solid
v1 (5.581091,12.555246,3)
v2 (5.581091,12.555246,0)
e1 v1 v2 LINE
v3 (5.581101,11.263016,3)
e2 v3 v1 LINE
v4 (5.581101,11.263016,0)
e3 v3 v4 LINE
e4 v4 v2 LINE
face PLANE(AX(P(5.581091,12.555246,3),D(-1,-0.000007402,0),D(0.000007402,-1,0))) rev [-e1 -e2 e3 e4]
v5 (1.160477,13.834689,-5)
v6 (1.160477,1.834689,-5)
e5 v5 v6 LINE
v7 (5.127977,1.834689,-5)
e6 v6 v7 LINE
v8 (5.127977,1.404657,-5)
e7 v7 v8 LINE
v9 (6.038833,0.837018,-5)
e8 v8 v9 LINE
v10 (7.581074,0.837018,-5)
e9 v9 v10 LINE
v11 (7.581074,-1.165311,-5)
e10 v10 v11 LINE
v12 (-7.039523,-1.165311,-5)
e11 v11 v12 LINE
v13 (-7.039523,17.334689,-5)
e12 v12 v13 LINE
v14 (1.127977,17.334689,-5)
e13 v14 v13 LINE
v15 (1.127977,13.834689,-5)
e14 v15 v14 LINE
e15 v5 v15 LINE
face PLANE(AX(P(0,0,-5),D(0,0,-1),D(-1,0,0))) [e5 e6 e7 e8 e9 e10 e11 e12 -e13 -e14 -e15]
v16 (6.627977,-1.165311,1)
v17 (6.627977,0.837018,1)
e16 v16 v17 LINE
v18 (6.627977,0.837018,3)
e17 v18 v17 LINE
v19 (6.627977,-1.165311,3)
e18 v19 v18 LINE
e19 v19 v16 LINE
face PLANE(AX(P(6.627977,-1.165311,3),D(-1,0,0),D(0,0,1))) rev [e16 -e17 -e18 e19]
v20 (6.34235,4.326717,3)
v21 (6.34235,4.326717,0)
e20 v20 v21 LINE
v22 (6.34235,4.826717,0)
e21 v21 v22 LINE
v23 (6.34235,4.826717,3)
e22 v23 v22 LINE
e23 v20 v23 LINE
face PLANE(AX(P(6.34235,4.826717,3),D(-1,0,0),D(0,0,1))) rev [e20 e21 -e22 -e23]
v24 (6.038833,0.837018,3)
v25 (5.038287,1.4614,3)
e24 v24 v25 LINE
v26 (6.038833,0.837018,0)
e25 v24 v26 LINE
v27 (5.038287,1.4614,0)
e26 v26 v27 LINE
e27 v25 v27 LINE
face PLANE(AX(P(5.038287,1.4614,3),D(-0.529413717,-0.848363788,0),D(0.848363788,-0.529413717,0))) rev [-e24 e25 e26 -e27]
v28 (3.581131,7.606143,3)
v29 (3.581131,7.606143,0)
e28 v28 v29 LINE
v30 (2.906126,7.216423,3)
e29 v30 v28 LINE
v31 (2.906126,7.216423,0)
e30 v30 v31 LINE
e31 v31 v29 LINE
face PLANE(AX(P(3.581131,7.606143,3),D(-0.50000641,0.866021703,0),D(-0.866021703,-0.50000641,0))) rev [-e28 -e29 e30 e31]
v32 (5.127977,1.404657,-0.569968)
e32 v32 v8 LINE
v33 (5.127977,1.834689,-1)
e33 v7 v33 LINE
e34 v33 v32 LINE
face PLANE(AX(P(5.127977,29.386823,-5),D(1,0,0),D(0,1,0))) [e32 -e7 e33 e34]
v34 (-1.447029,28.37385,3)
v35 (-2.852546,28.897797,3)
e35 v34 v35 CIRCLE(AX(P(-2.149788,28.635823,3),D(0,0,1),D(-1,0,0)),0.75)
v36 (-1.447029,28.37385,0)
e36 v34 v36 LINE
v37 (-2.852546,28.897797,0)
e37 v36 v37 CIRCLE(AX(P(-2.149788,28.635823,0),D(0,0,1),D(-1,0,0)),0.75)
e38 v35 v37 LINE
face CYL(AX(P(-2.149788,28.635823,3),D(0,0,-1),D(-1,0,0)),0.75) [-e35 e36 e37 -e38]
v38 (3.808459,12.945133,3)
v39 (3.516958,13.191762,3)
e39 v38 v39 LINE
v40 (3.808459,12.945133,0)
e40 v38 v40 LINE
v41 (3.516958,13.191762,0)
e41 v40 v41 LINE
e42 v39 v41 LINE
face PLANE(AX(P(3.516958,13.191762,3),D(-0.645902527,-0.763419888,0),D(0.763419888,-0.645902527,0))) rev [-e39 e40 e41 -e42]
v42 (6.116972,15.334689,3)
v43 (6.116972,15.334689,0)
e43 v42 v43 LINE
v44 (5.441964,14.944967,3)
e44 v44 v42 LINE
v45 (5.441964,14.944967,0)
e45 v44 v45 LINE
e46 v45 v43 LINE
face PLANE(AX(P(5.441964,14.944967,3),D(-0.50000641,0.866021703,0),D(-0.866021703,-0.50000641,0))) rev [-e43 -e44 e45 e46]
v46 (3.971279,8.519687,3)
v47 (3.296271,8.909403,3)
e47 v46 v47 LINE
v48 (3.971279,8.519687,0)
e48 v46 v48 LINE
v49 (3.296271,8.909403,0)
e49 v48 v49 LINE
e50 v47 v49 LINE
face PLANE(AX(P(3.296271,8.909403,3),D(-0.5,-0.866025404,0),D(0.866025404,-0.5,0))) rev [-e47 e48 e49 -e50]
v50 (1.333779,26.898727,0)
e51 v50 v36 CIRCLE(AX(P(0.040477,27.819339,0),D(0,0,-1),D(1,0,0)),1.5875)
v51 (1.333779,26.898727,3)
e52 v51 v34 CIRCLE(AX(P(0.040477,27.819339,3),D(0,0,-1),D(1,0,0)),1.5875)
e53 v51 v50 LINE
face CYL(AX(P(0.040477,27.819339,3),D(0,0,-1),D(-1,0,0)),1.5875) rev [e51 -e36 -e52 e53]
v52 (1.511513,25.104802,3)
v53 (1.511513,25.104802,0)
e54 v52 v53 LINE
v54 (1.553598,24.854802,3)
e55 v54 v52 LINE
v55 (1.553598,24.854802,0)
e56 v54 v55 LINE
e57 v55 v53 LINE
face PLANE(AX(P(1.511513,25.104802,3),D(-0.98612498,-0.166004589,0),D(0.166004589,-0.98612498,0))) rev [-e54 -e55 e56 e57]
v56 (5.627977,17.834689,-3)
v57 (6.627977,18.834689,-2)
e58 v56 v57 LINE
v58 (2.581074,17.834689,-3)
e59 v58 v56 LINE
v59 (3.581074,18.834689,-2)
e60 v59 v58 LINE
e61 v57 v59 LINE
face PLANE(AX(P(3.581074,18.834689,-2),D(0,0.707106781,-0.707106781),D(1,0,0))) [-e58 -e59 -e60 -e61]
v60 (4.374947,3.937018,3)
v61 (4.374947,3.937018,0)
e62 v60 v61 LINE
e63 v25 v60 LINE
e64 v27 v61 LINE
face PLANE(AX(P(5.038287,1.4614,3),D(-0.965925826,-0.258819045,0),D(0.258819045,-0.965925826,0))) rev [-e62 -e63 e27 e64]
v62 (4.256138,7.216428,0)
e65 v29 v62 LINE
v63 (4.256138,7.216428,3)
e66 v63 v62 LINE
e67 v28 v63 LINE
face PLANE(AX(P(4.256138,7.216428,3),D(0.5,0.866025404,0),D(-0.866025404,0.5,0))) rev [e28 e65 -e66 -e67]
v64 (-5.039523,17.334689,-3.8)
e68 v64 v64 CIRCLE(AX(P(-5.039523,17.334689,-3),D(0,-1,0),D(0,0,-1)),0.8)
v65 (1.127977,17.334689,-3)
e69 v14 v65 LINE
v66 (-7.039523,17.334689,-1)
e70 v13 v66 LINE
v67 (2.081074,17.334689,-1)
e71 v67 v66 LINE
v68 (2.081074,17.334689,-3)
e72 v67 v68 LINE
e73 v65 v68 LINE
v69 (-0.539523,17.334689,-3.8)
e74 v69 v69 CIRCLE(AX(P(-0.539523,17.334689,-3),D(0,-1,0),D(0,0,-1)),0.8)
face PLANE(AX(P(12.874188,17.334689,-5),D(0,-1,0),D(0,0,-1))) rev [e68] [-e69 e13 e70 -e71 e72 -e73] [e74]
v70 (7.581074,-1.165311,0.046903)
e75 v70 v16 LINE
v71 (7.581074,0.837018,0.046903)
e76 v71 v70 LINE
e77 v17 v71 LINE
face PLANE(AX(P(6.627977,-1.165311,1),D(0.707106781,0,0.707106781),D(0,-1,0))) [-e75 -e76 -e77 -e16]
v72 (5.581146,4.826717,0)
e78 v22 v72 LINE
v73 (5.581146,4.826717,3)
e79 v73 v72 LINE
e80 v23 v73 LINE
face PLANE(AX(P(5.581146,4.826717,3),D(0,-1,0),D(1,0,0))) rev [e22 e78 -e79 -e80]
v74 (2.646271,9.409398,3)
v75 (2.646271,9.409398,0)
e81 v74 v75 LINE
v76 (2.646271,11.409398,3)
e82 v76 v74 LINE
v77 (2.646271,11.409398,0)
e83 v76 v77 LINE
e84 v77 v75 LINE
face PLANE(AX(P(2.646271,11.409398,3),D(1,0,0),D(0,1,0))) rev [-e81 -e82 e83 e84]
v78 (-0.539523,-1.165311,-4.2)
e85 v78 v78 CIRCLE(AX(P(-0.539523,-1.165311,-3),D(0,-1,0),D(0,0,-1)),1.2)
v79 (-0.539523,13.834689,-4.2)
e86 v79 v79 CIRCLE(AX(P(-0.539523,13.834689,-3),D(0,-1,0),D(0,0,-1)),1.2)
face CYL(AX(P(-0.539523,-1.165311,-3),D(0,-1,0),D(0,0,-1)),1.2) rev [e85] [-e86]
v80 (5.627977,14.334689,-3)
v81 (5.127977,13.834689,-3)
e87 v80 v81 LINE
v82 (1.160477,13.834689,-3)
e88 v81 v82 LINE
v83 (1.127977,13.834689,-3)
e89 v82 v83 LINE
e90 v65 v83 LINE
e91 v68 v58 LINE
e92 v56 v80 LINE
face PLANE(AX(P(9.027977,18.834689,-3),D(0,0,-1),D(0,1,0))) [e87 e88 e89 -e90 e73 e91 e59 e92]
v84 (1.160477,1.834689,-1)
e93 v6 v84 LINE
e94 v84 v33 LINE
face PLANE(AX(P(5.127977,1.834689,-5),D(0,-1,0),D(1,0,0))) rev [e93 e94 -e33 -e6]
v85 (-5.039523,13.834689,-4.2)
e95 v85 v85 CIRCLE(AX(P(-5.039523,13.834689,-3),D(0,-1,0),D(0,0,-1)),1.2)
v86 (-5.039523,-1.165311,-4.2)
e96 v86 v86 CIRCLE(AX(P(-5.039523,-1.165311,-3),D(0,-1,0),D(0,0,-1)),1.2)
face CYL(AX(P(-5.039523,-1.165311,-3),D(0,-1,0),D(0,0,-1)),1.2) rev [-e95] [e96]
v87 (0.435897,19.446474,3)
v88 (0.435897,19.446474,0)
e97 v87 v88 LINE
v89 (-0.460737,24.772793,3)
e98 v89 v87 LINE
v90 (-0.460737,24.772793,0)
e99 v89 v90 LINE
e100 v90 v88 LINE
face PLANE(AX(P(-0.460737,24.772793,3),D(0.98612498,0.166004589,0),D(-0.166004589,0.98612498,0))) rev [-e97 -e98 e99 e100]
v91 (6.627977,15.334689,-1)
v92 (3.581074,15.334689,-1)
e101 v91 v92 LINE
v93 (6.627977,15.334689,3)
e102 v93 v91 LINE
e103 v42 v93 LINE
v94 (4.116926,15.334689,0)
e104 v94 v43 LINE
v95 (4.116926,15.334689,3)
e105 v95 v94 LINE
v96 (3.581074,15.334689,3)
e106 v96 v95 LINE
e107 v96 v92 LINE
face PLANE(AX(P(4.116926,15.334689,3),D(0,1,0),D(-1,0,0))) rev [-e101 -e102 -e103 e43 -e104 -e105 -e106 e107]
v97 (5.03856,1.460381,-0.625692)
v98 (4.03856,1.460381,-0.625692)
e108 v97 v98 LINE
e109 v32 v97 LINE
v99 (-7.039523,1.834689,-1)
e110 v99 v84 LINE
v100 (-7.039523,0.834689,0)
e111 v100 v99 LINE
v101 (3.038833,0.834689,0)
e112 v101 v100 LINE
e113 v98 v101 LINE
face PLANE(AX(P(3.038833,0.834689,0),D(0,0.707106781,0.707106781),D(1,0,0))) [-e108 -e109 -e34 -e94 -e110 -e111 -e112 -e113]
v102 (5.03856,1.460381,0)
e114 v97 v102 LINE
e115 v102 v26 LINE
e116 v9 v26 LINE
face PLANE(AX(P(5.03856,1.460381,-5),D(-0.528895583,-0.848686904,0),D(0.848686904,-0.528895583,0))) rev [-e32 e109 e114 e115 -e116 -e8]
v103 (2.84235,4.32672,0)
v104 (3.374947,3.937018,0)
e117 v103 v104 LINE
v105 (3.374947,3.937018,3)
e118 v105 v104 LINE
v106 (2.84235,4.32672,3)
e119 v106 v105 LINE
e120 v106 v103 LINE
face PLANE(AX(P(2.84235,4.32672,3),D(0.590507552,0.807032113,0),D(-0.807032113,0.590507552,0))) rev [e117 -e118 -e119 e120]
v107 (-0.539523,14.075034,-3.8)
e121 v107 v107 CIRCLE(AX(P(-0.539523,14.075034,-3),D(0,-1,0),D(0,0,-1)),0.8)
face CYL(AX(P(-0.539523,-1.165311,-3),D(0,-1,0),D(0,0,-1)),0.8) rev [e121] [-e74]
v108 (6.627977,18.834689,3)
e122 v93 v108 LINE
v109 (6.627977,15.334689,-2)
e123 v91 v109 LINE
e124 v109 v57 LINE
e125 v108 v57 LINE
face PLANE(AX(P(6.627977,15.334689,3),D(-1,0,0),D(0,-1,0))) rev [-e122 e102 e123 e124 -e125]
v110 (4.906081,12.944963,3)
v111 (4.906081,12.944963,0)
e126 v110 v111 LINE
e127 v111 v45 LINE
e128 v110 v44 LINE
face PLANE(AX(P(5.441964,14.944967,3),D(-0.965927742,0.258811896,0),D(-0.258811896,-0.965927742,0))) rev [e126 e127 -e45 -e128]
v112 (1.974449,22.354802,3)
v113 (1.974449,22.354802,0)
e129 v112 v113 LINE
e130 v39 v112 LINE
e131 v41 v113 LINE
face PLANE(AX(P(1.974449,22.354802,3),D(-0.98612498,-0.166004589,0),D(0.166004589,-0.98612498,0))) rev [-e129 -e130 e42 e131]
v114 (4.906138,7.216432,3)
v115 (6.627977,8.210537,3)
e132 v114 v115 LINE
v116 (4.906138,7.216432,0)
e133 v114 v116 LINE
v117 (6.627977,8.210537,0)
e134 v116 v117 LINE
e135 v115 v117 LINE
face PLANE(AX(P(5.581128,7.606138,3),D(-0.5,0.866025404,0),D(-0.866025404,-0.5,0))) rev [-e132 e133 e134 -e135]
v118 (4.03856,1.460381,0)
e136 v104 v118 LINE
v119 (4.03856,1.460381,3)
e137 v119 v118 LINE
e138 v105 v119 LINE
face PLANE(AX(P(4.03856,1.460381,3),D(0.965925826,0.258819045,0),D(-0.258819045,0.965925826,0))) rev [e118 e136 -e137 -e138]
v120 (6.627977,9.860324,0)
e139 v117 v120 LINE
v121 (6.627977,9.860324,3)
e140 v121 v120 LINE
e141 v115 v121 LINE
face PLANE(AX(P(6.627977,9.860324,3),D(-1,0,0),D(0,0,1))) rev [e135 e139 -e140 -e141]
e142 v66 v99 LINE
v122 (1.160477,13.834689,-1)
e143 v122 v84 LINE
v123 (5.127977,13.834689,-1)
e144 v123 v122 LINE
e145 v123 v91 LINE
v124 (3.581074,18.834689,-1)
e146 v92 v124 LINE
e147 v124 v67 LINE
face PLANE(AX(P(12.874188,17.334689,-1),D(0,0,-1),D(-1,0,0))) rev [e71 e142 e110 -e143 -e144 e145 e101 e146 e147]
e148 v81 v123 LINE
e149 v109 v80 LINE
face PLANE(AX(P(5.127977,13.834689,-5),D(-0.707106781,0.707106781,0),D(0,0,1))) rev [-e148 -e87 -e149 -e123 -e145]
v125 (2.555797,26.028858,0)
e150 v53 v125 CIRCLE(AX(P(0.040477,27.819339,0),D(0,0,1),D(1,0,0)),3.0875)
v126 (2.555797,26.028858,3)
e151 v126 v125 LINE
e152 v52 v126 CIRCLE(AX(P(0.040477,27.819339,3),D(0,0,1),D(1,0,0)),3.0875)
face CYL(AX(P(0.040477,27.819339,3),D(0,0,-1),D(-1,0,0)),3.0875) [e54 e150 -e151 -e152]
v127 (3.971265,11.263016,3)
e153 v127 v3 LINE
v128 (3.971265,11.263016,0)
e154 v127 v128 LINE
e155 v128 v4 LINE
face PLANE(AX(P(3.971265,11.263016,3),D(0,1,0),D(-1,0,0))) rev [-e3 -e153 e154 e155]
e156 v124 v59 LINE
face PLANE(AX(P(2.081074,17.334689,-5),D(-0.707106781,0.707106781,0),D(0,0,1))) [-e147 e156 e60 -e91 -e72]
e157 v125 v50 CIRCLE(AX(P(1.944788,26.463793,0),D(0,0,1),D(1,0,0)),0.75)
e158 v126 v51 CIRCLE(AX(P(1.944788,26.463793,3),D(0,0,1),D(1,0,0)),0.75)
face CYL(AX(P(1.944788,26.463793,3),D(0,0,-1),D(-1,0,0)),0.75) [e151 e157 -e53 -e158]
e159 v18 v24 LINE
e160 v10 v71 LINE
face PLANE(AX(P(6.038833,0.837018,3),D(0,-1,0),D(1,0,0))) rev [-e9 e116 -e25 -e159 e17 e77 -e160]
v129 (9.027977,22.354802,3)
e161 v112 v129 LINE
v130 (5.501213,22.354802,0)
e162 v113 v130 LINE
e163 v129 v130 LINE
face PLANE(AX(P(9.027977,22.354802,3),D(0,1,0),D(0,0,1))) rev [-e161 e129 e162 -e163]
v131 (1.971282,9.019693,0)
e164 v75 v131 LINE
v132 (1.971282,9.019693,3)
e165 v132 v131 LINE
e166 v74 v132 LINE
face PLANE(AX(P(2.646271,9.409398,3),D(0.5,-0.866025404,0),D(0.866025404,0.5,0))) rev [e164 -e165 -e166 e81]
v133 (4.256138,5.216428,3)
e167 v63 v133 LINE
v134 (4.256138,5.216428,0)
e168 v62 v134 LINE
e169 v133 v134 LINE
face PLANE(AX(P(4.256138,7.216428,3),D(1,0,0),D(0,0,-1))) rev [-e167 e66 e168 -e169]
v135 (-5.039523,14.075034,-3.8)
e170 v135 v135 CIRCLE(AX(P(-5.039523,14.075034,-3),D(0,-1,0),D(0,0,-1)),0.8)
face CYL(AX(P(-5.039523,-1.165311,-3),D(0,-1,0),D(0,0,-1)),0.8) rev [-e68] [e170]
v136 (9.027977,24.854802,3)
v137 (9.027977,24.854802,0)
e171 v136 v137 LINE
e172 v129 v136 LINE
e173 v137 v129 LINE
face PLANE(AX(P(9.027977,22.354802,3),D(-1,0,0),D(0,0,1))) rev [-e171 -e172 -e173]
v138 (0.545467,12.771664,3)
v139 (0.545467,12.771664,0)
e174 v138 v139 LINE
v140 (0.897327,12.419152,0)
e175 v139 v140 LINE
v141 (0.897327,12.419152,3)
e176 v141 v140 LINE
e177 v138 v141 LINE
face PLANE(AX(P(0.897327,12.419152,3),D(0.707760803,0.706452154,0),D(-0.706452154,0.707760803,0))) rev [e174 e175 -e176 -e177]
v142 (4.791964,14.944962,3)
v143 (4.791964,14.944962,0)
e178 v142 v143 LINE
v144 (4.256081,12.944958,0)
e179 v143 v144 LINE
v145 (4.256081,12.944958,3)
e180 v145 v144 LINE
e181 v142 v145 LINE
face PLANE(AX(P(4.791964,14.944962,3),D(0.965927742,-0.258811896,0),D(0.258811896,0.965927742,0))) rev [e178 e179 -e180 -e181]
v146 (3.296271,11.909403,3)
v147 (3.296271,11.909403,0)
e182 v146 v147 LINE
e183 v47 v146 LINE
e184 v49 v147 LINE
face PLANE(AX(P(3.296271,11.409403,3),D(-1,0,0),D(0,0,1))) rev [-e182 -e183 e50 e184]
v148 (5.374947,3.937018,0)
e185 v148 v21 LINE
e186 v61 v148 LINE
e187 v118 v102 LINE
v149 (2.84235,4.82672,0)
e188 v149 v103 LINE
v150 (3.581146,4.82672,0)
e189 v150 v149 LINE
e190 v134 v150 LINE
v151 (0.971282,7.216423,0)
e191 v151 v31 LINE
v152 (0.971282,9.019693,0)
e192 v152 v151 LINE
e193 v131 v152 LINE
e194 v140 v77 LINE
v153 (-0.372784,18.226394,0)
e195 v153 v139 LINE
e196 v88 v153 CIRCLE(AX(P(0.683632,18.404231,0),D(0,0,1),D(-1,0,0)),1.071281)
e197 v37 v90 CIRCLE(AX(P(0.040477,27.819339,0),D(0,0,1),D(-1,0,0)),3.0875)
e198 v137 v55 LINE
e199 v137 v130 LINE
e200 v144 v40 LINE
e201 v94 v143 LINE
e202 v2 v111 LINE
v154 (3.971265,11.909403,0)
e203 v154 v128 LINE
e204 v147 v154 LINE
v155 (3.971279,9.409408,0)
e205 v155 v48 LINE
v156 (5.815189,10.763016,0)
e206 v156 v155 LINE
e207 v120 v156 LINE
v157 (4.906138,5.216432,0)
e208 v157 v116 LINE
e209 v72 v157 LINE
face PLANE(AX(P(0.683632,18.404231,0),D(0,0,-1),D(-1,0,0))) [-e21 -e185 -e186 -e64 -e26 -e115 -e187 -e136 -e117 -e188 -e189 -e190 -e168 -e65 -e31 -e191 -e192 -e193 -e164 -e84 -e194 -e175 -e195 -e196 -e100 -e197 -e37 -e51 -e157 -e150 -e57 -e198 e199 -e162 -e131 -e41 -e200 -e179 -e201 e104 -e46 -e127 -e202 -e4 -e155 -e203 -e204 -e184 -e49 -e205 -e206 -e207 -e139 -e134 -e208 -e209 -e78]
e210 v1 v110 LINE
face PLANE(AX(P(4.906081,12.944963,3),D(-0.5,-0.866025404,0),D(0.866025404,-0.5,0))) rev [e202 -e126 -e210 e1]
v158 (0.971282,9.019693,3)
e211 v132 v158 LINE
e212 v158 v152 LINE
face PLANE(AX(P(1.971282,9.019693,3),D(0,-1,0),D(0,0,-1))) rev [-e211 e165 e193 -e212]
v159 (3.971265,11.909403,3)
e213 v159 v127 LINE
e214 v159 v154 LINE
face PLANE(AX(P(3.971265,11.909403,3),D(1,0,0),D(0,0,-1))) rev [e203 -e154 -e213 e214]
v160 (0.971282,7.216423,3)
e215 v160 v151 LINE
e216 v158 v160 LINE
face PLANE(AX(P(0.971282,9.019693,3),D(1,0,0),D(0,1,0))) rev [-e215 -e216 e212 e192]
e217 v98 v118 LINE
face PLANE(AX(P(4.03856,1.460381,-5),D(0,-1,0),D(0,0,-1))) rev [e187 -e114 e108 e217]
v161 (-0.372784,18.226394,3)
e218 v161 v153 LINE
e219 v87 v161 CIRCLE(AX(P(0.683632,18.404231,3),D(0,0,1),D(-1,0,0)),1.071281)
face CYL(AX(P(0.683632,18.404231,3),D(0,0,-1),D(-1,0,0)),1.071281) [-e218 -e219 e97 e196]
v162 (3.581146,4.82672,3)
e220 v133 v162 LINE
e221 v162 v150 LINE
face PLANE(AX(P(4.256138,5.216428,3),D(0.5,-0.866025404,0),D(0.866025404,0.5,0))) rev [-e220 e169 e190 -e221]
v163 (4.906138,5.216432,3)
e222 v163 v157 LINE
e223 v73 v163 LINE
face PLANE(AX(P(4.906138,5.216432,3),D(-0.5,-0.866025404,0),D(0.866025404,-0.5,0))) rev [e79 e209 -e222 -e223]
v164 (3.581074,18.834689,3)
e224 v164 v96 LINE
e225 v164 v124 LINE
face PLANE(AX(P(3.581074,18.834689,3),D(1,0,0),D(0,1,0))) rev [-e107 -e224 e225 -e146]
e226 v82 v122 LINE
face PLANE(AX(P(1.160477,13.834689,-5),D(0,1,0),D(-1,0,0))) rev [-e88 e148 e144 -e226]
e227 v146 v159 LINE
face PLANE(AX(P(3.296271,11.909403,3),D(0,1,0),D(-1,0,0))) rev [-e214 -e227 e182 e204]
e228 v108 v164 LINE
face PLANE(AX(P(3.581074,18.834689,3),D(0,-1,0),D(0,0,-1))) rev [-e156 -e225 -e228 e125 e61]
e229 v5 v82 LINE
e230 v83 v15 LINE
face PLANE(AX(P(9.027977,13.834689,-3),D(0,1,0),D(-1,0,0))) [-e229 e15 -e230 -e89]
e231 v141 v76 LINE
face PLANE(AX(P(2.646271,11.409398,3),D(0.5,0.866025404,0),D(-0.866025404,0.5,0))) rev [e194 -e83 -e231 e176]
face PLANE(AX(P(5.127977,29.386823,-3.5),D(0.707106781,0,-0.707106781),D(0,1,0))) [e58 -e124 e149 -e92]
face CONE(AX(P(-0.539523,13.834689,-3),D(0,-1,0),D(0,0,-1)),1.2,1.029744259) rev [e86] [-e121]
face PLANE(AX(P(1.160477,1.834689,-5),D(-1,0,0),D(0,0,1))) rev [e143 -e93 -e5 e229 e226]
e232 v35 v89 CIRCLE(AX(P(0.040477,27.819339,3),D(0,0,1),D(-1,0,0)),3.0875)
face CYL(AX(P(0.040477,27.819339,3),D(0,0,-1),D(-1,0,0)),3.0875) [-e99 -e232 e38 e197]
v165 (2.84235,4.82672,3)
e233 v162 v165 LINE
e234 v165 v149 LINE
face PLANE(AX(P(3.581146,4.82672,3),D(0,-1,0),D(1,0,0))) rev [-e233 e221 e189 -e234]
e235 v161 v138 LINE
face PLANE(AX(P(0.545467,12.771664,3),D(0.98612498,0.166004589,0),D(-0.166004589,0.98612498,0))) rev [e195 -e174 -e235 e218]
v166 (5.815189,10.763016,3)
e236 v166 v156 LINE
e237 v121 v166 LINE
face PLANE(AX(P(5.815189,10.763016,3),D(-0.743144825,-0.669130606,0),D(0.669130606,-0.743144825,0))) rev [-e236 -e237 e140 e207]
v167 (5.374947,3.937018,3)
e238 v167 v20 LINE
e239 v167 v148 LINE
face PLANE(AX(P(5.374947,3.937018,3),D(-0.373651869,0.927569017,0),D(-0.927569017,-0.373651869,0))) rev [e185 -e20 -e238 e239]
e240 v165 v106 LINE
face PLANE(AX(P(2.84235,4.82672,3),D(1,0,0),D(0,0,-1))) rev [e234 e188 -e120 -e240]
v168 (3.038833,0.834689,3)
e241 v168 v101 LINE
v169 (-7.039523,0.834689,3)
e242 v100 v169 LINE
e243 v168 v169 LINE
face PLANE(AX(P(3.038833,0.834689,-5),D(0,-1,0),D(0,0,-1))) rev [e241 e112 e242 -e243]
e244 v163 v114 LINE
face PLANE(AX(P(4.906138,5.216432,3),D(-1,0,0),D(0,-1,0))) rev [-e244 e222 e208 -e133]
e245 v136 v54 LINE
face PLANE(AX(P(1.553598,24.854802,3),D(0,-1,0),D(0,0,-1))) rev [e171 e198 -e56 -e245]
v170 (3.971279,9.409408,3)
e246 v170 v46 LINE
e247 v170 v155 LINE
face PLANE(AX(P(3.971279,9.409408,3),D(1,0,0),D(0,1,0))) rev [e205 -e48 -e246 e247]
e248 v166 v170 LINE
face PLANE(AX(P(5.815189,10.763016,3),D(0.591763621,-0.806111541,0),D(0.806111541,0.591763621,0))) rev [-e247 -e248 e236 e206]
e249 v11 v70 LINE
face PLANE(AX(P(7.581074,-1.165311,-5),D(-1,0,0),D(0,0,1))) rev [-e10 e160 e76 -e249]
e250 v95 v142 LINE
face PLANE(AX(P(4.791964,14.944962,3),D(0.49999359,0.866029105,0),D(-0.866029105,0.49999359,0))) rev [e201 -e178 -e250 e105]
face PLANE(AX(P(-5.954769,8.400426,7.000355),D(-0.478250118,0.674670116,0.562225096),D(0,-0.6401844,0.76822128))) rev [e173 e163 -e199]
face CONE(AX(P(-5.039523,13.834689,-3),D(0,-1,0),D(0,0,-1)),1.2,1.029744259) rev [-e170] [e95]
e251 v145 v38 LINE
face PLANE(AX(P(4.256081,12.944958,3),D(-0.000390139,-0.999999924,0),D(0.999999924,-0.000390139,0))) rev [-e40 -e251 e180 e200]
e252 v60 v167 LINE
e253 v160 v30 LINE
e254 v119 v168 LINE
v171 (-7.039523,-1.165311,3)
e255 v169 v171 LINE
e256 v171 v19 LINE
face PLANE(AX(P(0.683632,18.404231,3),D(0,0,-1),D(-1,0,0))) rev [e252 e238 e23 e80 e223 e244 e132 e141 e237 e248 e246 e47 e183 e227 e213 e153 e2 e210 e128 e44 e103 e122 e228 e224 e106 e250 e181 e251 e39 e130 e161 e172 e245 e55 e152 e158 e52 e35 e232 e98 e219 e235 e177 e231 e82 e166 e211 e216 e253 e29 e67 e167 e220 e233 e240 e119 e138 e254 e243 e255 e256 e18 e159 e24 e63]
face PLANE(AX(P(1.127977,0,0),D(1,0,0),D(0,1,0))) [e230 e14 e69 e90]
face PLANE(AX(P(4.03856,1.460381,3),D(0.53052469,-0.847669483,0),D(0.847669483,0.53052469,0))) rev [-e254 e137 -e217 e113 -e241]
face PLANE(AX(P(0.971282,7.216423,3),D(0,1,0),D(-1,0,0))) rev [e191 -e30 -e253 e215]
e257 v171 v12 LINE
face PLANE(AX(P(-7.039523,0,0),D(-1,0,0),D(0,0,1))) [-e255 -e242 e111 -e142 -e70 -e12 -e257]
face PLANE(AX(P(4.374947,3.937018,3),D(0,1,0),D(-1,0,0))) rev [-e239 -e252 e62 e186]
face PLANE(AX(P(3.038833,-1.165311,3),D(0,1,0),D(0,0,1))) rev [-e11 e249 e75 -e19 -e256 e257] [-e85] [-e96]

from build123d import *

# Parameters (mm, degrees)
BOSS_SWITCH_BODY_DEPTH                    = 3
SKETCH1_W                                 = 4
SKETCH1_H                                 = 3.5
BOSS_FLANGE_WIDTH_DEPTH                   = 5
BOSS_FLANGE_HEIGHT_REACH                  = 35.863
SKETCH2_W                                 = 4
SKETCH2_H                                 = 2
SKETCH2_W_2                               = 8
CUT_UP_TO_DOWN_DERAILLEUR_CLEARANCE_REACH = 21.462
SKETCH10_W                                = 2.453096586
SKETCH10_H                                = 3
SKETCH17_W                                = 12.1675
SKETCH17_H                                = 4
BOSS_FLANGE_SUPPORT_DEPTH                 = 14.5
TAP_DRILL_FOR_M2X0_4_TAP1_D               = 1.6
M2_CLEARANCE_HOLE2_D                      = 2.4
M2_CLEARANCE_HOLE2_DEPTH                  = 15
M2_CLEARANCE_HOLE2_TIP                    = 0.721032743
CHAMFER_FLANGE_SUPPORT_SIZE               = 1.5
CHAMFER_FLANGE_SUPPORT_2_SIZE             = 1.5
CHAMFER_FLANGE_SUPPORT_3_SIZE             = 1
SKETCH23_W                                = 3.9675
SKETCH23_H                                = 12
CUT_GAP_FOR_PRINTING_DEPTH                = 32.000499688
SKETCH25_W                                = 0.953096586
SKETCH25_H                                = 3.5
CUT_DERAILLEUR_CLEARANCE_DEPTH            = 32.145320369
CHAMFER8_SIZE                             = 1
CUT_EXTRUDE1_REACH                        = 30.441
SKETCH26_W                                = 7.075346244
SKETCH26_H                                = 3.905124838
CUT_WIDE_DERAILLEUR_CLEARANCE_DEPTH       = 33.195879702
CUT_WIDE_DERAILLEUR_CLEARANCE_DEPTH_BACK  = 4
SKETCH27_W                                = 2
SKETCH27_H                                = 5
CHAMFER9_SIZE                             = 1


# Some blends are built 0.0001 mm under size
with BuildPart() as part:
    # Sketch-SwitchBossUp → Boss-Switch Body (new body)
    with BuildSketch(Plane.XY):
        with BuildLine():
            Line((5.581091201, 12.555245643), (5.581100766, 11.263016279))
            Line((5.581100766, 11.263016279), (3.971265023, 11.263016279))
            Line((3.971265023, 11.263016279), (3.971265023, 11.909403061))
            Line((3.971265023, 11.909403061), (3.296271341, 11.909403061))
            Line((3.296271341, 11.909403061), (3.296271341, 11.409403061))
            Line((3.296271341, 11.409403061), (3.296271341, 9.409403061))
            Line((3.296271341, 9.409403061), (3.296271341, 8.909403061))
            Line((3.296271341, 8.909403061), (3.971278743, 8.519687356))
            Line((3.971278743, 8.519687356), (3.971278743, 9.409408058))
            Line((3.971278743, 9.409408058), (5.815189336, 10.763016279))
            Line((5.815189336, 10.763016279), (6.627976927, 9.860324207))
            Line((6.627976927, 9.860324207), (6.627976927, 8.210536506))
            Line((6.627976927, 8.210536506), (5.581127833, 7.606137899))
            Line((5.581127833, 7.606137899), (4.906138119, 7.216432406))
            Line((4.906138119, 7.216432406), (4.906138119, 5.216432406))
            Line((4.906138119, 5.216432406), (5.58114552, 4.826716701))
            Line((5.58114552, 4.826716701), (6.342350466, 4.826716701))
            Line((6.342350466, 4.826716701), (6.342350466, 4.326716701))
            Line((6.342350466, 4.326716701), (5.374946804, 3.937018274))
            Line((5.374946804, 3.937018274), (4.374946804, 3.937018274))
            Line((4.374946804, 3.937018274), (5.038286759, 1.461399857))
            Line((5.038286759, 1.461399857), (6.03883266, 0.837018274))
            Line((6.03883266, 0.837018274), (6.627976927, 0.837018274))
            Line((6.627976927, 0.837018274), (6.627976927, -1.165310653))
            Line((6.627976927, -1.165310653), (5.038286759, -1.165310653))
            Line((5.038286759, -1.165310653), (3.03883266, -1.165310653))
            Line((3.03883266, -1.165310653), (3.03883266, 0.834689347))
            Line((3.03883266, 0.834689347), (4.03855971, 1.460381193))
            Line((4.03855971, 1.460381193), (3.374946804, 3.937018274))
            Line((3.374946804, 3.937018274), (2.842350466, 4.326720436))
            Line((2.842350466, 4.326720436), (2.842350466, 4.826720436))
            Line((2.842350466, 4.826720436), (3.58114552, 4.826720436))
            Line((3.58114552, 4.826720436), (4.256138119, 5.216427595))
            Line((4.256138119, 5.216427595), (4.256138119, 7.216427595))
            Line((4.256138119, 7.216427595), (3.581130717, 7.6061433))
            Line((3.581130717, 7.6061433), (2.9061262, 7.216422599))
            Line((2.9061262, 7.216422599), (0.971281627, 7.216422599))
            Line((0.971281627, 7.216422599), (0.971281627, 9.019692757))
            Line((0.971281627, 9.019692757), (1.971281627, 9.019692757))
            Line((1.971281627, 9.019692757), (2.646271341, 9.40939825))
            Line((2.646271341, 9.40939825), (2.646271341, 11.40939825))
            Line((2.646271341, 11.40939825), (0.897326855, 12.41915182))
            Line((0.897326855, 12.41915182), (0.545466745, 12.771663724))
            Line((0.545466745, 12.771663724), (-0.372784255, 18.226393961))
            ThreePointArc((-0.372784255, 18.226393961), (-0.209313172, 18.996084896), (0.435897335, 19.446473985))
            Line((0.435897335, 19.446473985), (-0.46073685, 24.772792819))
            ThreePointArc((-0.46073685, 24.772792819), (-2.630501593, 26.270619745), (-2.852546321, 28.897797067))
            ThreePointArc((-2.852546321, 28.897797067), (-1.887813913, 29.338582026), (-1.447028953, 28.373849618))
            ThreePointArc((-1.447028953, 28.373849618), (-0.703448682, 26.416936722), (1.333779254, 26.898727173))
            ThreePointArc((1.333779254, 26.898727173), (2.379722745, 27.074801628), (2.555797201, 26.028858137))
            ThreePointArc((2.555797201, 26.028858137), (2.086504637, 25.507104397), (1.511513111, 25.104801997))
            Line((1.511513111, 25.104801997), (1.553598189, 24.854801997))
            Line((1.553598189, 24.854801997), (9.027976927, 24.854801997))
            Line((9.027976927, 24.854801997), (9.027976927, 22.354801997))
            Line((9.027976927, 22.354801997), (1.974448974, 22.354801997))
            Line((1.974448974, 22.354801997), (3.516958068, 13.191761617))
            Line((3.516958068, 13.191761617), (3.808459197, 12.945132837))
            Line((3.808459197, 12.945132837), (4.256080915, 12.944958203))
            Line((4.256080915, 12.944958203), (4.791964496, 14.944962169))
            Line((4.791964496, 14.944962169), (4.116925685, 15.334689347))
            Line((4.116925685, 15.334689347), (3.581073513, 15.334689347))
            Line((3.581073513, 15.334689347), (3.581073513, 18.834689347))
            Line((3.581073513, 18.834689347), (5.725580434, 18.834689347))
            Line((5.725580434, 18.834689347), (6.627976927, 18.834689347))
            Line((6.627976927, 18.834689347), (6.627976927, 15.334689347))
            Line((6.627976927, 15.334689347), (6.116971898, 15.334689347))
            Line((6.116971898, 15.334689347), (5.441964496, 14.94496698))
            Line((5.441964496, 14.94496698), (4.906080915, 12.944963014))
            Line((4.906080915, 12.944963014), (5.581091201, 12.555245643))
        make_face()
    extrude(amount=BOSS_SWITCH_BODY_DEPTH)

    # Sketch1 → Boss-Flange Width (add)
    with BuildSketch(Plane(origin=(0, 0, 0), x_dir=(-1, 0, 0), z_dir=(0, 0, -1))):
        Polygon((-7.581073513, -1.165310653), (0.412170615, -1.165310653), (0.412170615, 0.834689347), (-3.03883266, 0.834689347), (-4.03855971, 1.460381193), (-5.03855971, 1.460381193), (-6.03883266, 0.837018274), (-7.581073513, 0.837018274), align=None)
        with Locations((-5.581073513, 17.084689347)):
            Rectangle(SKETCH1_W, SKETCH1_H)
    extrude(amount=BOSS_FLANGE_WIDTH_DEPTH)

    # Sketch2 → Boss-Flange Height (add, up to next)
    with BuildSketch(Plane(origin=(-7.039523073, 0, 0), x_dir=(0, 0, -1), z_dir=(1, 0, 0)), mode=Mode.PRIVATE) as boss_flange_height_sk1:
        with Locations((3, 16.334689347)):
            Rectangle(SKETCH2_W, SKETCH2_H)
    boss_flange_height_tool1 = extrude(boss_flange_height_sk1.sketch, amount=BOSS_FLANGE_HEIGHT_REACH, mode=Mode.PRIVATE) - part.part
    # Sketch2 → Boss-Flange Height (add, up to next)
    with BuildSketch(Plane(origin=(-7.039523073, 0, 0), x_dir=(0, 0, -1), z_dir=(1, 0, 0)), mode=Mode.PRIVATE) as boss_flange_height_sk2:
        with Locations((1, -0.165310653)):
            Rectangle(SKETCH2_W_2, SKETCH2_H)
    boss_flange_height_tool2 = extrude(boss_flange_height_sk2.sketch, amount=BOSS_FLANGE_HEIGHT_REACH, mode=Mode.PRIVATE) - part.part
    add(boss_flange_height_tool1.solids().sort_by_distance((-7.039523, 16.334689, -3))[0])
    add(boss_flange_height_tool2.solids().sort_by_distance((-7.039523, -0.165311, -1))[0])

    # Sketch10 → Cut-Up-To-Down Derailleur Clearance (cut, up to next)
    with BuildSketch(Plane(origin=(0, 15.334689347, 0), x_dir=(1, 0, 0), z_dir=(0, 1, 0)), mode=Mode.PRIVATE) as cut_up_to_down_derailleur_clearance_sk1:
        with Locations((6.35452522, 3.5)):
            Rectangle(SKETCH10_W, SKETCH10_H)
    cut_up_to_down_derailleur_clearance_tool1 = extrude(cut_up_to_down_derailleur_clearance_sk1.sketch, amount=CUT_UP_TO_DOWN_DERAILLEUR_CLEARANCE_REACH, mode=Mode.PRIVATE) & part.part
    add(cut_up_to_down_derailleur_clearance_tool1.solids().sort_by_distance((6.354525, 15.334689, -3.5))[0], mode=Mode.SUBTRACT)

    # Sketch17 → Boss-Flange Support (add)
    with BuildSketch(Plane.XZ.offset(-15.334689347)):
        with Locations((-0.955773073, -3)):
            Rectangle(SKETCH17_W, SKETCH17_H)
    extrude(amount=BOSS_FLANGE_SUPPORT_DEPTH)

    # Tap Drill for M2x0.4 Tap1 (through all)
    with Locations(Plane(origin=(0, -1.165310653, 0), x_dir=(-1, 0, 0), z_dir=(0, -1, 0))):
        with Locations((5.039523073, 3), (0.539523073, 3)):
            Hole(TAP_DRILL_FOR_M2X0_4_TAP1_D / 2)

    # M2 Clearance Hole2
    with Locations(Plane.XZ.offset(1.165310653)):
        with Locations((-5.039523073, -3), (-0.539523073, -3)):
            Hole(M2_CLEARANCE_HOLE2_D / 2, depth=M2_CLEARANCE_HOLE2_DEPTH)
            with Locations((0, 0, -(M2_CLEARANCE_HOLE2_DEPTH + M2_CLEARANCE_HOLE2_TIP / 2))):  # 118° drill point
                Cone(0, M2_CLEARANCE_HOLE2_D / 2, M2_CLEARANCE_HOLE2_TIP, mode=Mode.SUBTRACT)

    # Chamfer-Flange Support
    chamfer_flange_support_edges = [part.edges().sort_by_distance(p)[0] for p in [
        (3.581073513, 17.334689347, -3),
    ]]
    chamfer(chamfer_flange_support_edges, length=CHAMFER_FLANGE_SUPPORT_SIZE - 0.0001)  # a hair under: the kernel refuses the full size

    # Chamfer-Flange Support 2
    chamfer_flange_support_2_edges = [part.edges().sort_by_distance(p)[0] for p in [
        (5.127976927, 17.084689347, -2),
        (5.127976927, 15.334689347, -1.5),
    ]]
    chamfer(chamfer_flange_support_2_edges, length=CHAMFER_FLANGE_SUPPORT_2_SIZE)

    # Chamfer-Flange Support 3
    chamfer_flange_support_3_edges = [part.edges().sort_by_distance(p)[0] for p in [
        (-2.000345206, 0.834689347, -1),
    ]]
    chamfer(chamfer_flange_support_3_edges, length=CHAMFER_FLANGE_SUPPORT_3_SIZE)

    # Sketch23 → Cut-Gap for Printing (cut, through all)
    with BuildSketch(Plane.XY.offset(-1)):
        with Locations((3.144226927, 7.834689347)):
            Rectangle(SKETCH23_W, SKETCH23_H)
    extrude(amount=-CUT_GAP_FOR_PRINTING_DEPTH, mode=Mode.SUBTRACT)

    # Sketch25 → Cut-Derailleur Clearance (cut, through all)
    with BuildSketch(Plane.XY):
        with Locations((7.10452522, 17.084689347)):
            Rectangle(SKETCH25_W, SKETCH25_H)
    extrude(amount=-CUT_DERAILLEUR_CLEARANCE_DEPTH, mode=Mode.SUBTRACT)

    # Chamfer8
    # the kernel refuses this chamfer: 1 mm, written as the material it adds along each edge
    with BuildSketch(Plane(origin=(6.627976927, 0.837018274, 0), x_dir=(-0.027495876610586494, 0, 0.9996219169112968), z_dir=(0, -1, 0))) as chamfer8_piece_1_section:
        Polygon((CHAMFER8_SIZE * 0.999621916911, -CHAMFER8_SIZE * 0.0274958766106), (-CHAMFER8_SIZE * 0.0274958766106, -CHAMFER8_SIZE * 0.999621916911), (0, 0), align=None)
    chamfer8_piece_1 = extrude(amount=2.002328927, mode=Mode.PRIVATE)
    chamfer8_piece_1 = split(chamfer8_piece_1, bisect_by=Plane(origin=(7.581073513, -0.16414619, 0.332375145), z_dir=(-1, 0, 0)), keep=Keep.TOP, mode=Mode.PRIVATE)
    add(chamfer8_piece_1)

    # Sketch26 → Cut-Extrude1 (cut, up to next)
    with BuildSketch(Plane(origin=(-5.954769273, 8.400426305, 7.000355254), x_dir=(-0.8782236755158304, -0.3674019179359696, -0.30616826494664123), z_dir=(0.47825011841448156, -0.6746701157774819, -0.5622250964812346)), mode=Mode.PRIVATE) as cut_extrude1_sk1:
        with Locations((-16.492565132, 13.959094076)):
            Rectangle(SKETCH26_W, SKETCH26_H)
    cut_extrude1_tool1 = extrude(cut_extrude1_sk1.sketch, amount=CUT_EXTRUDE1_REACH, mode=Mode.PRIVATE) & part.part
    add(cut_extrude1_tool1.solids().sort_by_distance((8.529392, 23.396221, 1.326182))[0], mode=Mode.SUBTRACT)

    # Sketch27 → Cut-Wide Derailleur Clearance (cut, two sides: drawn at the far end of the back side and taken through both)
    with BuildSketch(Plane(origin=(5.127976927, 0, 0), x_dir=(0, 0, -1), z_dir=(1, 0, 0)).offset(-CUT_WIDE_DERAILLEUR_CLEARANCE_DEPTH_BACK)):
        with Locations((4, 16.334689347)):
            Rectangle(SKETCH27_W, SKETCH27_H)
    extrude(amount=CUT_WIDE_DERAILLEUR_CLEARANCE_DEPTH + CUT_WIDE_DERAILLEUR_CLEARANCE_DEPTH_BACK, mode=Mode.SUBTRACT)

    # Chamfer9
    chamfer9_edges = [part.edges().sort_by_distance(p)[0] for p in [
        (4.60452522, 18.834689347, -3),
    ]]
    chamfer(chamfer9_edges, length=CHAMFER9_SIZE)


solid = part.part
